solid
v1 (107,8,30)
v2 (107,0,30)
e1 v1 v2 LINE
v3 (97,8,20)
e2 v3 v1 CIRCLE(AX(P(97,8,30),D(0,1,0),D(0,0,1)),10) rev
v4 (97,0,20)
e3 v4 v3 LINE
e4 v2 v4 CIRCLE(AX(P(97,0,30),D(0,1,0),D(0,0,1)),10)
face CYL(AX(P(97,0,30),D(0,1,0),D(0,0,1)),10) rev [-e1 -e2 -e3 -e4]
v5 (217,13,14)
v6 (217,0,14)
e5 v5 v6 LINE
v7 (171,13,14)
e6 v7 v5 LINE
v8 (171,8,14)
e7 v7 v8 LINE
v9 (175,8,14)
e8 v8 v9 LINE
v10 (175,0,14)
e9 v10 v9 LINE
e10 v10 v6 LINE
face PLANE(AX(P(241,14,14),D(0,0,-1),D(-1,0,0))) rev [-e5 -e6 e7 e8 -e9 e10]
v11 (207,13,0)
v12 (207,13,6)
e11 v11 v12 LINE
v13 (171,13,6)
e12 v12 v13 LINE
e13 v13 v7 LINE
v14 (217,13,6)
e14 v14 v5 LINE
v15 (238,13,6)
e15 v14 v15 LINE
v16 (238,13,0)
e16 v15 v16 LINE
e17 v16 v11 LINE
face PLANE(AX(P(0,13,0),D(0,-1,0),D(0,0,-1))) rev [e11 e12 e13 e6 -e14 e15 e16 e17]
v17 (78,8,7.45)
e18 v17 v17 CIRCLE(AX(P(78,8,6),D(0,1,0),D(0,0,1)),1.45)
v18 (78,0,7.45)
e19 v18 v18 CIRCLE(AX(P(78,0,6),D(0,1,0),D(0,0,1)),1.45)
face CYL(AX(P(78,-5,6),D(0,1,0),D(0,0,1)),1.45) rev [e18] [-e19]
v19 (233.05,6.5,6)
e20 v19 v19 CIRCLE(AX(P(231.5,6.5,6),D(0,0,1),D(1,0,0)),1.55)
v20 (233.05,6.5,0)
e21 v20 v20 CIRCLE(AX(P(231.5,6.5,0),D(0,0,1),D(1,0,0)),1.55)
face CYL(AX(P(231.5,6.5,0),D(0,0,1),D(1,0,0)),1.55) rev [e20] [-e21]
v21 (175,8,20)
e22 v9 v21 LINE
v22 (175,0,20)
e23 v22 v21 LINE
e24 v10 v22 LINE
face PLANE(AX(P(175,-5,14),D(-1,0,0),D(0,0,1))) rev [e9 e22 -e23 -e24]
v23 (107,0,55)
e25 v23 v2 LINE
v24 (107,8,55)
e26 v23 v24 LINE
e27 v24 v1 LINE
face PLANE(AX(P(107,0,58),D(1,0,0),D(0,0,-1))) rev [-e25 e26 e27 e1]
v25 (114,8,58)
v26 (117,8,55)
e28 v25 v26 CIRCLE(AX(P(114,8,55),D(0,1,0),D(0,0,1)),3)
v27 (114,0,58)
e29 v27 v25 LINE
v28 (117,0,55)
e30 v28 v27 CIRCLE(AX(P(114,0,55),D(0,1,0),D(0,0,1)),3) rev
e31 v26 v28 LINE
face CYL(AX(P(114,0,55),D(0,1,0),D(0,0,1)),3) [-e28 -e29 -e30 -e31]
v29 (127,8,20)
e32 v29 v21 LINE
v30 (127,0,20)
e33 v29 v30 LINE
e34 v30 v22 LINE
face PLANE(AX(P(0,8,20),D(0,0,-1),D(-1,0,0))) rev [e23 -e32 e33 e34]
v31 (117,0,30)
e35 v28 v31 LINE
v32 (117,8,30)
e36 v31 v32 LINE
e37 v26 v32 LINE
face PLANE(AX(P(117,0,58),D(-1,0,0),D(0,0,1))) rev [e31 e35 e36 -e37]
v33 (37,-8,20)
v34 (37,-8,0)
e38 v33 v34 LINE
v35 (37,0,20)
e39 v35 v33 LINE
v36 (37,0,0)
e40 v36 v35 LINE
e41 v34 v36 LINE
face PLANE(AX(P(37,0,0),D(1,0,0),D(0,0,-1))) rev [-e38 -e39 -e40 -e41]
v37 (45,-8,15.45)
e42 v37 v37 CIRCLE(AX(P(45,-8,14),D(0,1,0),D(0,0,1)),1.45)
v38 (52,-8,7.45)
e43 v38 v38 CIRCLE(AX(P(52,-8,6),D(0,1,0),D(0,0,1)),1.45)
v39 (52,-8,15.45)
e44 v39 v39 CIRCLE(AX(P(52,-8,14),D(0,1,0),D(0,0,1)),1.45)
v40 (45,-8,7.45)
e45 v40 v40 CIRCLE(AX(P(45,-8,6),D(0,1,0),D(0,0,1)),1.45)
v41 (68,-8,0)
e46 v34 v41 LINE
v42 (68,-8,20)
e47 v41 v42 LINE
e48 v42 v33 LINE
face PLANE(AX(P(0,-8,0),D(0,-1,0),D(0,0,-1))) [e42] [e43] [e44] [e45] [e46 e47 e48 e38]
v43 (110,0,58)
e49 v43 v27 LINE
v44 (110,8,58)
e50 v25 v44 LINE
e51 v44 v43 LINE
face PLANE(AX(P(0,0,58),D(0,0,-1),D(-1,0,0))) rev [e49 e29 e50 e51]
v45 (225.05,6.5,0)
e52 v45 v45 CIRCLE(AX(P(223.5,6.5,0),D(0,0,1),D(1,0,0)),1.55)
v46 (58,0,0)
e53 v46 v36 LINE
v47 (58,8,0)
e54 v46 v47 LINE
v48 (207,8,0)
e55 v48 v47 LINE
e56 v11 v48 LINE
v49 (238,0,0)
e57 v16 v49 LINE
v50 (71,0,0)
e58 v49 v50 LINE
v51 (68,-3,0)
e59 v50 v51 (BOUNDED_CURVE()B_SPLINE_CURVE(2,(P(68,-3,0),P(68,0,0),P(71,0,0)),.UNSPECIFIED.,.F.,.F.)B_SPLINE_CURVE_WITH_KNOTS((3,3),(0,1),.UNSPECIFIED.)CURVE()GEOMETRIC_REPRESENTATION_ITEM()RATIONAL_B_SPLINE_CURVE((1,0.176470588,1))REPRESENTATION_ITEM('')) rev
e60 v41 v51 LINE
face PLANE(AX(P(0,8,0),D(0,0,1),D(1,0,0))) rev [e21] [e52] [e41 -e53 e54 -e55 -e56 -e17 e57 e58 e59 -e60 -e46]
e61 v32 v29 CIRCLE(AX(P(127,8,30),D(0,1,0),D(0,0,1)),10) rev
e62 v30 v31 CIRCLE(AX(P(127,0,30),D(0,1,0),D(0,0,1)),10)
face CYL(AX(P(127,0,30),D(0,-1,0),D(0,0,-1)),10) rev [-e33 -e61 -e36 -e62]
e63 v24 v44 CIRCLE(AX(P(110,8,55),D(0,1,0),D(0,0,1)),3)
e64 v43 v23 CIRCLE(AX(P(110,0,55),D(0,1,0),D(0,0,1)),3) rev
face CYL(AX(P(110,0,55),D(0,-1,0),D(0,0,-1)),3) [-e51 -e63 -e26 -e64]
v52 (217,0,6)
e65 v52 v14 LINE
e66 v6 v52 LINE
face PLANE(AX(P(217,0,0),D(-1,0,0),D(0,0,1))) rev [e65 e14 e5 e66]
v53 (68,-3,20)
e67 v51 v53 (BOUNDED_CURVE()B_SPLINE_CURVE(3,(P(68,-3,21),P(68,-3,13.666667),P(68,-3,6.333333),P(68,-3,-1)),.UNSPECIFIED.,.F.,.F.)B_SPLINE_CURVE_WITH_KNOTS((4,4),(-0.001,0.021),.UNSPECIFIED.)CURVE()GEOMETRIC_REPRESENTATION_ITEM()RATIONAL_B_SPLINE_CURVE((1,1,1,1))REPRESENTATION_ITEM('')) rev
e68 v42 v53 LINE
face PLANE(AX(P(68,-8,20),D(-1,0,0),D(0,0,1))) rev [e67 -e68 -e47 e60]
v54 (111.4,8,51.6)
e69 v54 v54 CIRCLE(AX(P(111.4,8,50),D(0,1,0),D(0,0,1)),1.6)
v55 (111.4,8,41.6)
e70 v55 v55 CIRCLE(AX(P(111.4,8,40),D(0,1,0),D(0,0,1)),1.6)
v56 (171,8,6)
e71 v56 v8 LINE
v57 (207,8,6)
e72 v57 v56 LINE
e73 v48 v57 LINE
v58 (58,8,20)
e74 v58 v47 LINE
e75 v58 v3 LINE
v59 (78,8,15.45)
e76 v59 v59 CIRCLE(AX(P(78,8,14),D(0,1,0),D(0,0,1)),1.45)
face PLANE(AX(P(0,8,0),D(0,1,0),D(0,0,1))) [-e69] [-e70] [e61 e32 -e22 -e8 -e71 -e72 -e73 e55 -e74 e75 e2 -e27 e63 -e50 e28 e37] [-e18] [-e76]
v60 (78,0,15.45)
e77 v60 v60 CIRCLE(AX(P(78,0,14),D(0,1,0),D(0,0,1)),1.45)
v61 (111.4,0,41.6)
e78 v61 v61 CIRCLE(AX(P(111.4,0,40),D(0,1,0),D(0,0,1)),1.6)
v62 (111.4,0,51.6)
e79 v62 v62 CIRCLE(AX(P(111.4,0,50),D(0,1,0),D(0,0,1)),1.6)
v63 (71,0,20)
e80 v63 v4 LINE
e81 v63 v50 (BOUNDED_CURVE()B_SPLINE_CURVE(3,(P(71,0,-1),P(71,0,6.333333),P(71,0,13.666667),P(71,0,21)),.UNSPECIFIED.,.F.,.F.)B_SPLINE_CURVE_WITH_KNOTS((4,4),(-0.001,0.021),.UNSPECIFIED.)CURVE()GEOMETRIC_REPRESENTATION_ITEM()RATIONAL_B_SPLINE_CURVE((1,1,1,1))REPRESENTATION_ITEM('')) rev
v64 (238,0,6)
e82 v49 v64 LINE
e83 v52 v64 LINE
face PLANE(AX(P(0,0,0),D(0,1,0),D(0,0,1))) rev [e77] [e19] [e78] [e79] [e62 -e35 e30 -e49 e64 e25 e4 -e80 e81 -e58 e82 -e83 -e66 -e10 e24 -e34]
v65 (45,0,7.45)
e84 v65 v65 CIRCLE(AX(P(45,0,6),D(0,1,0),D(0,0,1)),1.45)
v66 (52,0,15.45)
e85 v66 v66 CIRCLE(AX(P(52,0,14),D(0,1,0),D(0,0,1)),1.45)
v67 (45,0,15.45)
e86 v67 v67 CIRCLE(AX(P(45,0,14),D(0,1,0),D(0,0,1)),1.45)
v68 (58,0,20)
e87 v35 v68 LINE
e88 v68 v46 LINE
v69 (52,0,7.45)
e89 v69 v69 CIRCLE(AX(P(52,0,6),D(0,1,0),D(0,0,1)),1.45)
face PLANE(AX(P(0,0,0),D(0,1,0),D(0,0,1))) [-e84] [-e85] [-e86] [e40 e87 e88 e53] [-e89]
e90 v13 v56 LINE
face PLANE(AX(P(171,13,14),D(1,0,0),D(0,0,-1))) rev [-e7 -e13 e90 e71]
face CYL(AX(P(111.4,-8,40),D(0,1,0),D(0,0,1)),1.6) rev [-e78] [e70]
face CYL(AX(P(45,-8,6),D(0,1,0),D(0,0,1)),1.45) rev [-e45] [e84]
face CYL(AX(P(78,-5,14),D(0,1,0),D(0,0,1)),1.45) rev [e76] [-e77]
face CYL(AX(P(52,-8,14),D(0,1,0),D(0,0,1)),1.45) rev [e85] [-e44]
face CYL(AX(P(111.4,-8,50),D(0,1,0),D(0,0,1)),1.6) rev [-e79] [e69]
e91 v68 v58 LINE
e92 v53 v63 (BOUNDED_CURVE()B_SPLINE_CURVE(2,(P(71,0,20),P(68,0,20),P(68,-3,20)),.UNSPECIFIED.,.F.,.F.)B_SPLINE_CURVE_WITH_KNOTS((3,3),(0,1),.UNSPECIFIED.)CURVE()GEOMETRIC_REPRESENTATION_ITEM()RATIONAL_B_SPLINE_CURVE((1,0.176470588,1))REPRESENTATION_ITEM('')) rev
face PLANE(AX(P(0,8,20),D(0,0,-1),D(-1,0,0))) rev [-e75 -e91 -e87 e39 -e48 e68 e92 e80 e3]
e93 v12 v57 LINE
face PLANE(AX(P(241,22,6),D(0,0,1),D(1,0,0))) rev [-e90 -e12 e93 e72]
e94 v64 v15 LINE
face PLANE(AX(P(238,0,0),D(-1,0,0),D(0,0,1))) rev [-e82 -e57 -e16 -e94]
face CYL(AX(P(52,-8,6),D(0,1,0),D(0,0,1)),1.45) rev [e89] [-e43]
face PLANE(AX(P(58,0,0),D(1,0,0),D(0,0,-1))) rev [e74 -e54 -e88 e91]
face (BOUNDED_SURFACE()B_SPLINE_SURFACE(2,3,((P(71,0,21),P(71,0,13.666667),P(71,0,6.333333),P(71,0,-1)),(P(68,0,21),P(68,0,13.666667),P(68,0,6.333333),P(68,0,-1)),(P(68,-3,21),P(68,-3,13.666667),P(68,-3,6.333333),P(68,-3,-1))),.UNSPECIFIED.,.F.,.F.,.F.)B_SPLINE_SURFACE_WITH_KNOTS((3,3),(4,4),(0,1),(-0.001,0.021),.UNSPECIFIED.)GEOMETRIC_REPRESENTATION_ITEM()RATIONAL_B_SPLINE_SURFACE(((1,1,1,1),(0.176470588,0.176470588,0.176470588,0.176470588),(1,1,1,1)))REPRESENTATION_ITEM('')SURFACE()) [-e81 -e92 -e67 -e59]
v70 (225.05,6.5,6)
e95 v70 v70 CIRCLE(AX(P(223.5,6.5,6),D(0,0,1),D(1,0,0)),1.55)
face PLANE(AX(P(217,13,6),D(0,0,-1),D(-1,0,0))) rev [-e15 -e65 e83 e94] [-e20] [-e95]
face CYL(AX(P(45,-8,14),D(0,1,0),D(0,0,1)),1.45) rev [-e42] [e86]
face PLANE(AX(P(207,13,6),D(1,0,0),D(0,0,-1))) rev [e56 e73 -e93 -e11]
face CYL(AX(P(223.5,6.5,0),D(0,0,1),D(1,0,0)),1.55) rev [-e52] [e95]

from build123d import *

# Parameters (mm, degrees)
SKETCH1_W                 = 300
SKETCH1_H                 = 20
BOSS_EXTRUDE1_DEPTH       = 8
SKETCH2_W                 = 34
SKETCH2_H                 = 8
BOSS_EXTRUDE2_DEPTH       = 9
SKETCH3_W                 = 34
SKETCH3_H                 = 8
BOSS_EXTRUDE3_DEPTH       = 9
SKETCH4_R                 = 1.45
CUT_EXTRUDE1_DEPTH        = 302.504560496
SKETCH5_W                 = 25
SKETCH5_H                 = 8
BOSS_EXTRUDE4_DEPTH       = 17
SKETCH6_W                 = 25
SKETCH6_H                 = 8
BOSS_EXTRUDE5_DEPTH       = 17
SKETCH12_W                = 8
SKETCH12_H                = 8
BOSS_EXTRUDE7_DEPTH       = 17
BOSS_EXTRUDE8_DEPTH       = 12
SKETCH15_R                = 1.6
CUT_EXTRUDE7_DEPTH        = 20
SKETCH16_W                = 20
SKETCH16_H                = 13
BOSS_EXTRUDE9_DEPTH       = 12
SKETCH17_R                = 1.6
CUT_EXTRUDE8_DEPTH        = 20
SKETCH18_W                = 20
SKETCH18_H                = 13
BOSS_EXTRUDE10_DEPTH      = 12
CUT_EXTRUDE9_START        = -20
SKETCH19_R                = 1.6
CUT_EXTRUDE9_DEPTH        = 20
SKETCH20_W                = 20
SKETCH20_H                = 13
BOSS_EXTRUDE11_DEPTH      = 12
CUT_EXTRUDE10_START       = -20
SKETCH21_R                = 1.6
CUT_EXTRUDE10_DEPTH       = 20
SKETCH22_W                = 10
SKETCH22_H                = 38
CUT_EXTRUDE11_DEPTH       = 306.0983448
SKETCH23_W                = 8
SKETCH23_H                = 18
CUT_EXTRUDE12_DEPTH       = 4
BOSS_EXTRUDE12_DEPTH      = 10
BOSS_EXTRUDE13_DEPTH      = 8
SKETCH26_W                = 8
SKETCH26_H                = 48
BOSS_EXTRUDE14_DEPTH      = 14
SKETCH27_W                = 8
SKETCH27_H                = 16
BOSS_EXTRUDE15_DEPTH      = 14
SKETCH28_W                = 8
SKETCH28_H                = 40
CUT_EXTRUDE13_DEPTH       = 14
SKETCH30_W                = 16
SKETCH30_H                = 14
BOSS_EXTRUDE16_DEPTH      = 9
SKETCH31_W                = 17
SKETCH31_H                = 8
CUT_EXTRUDE14_DEPTH       = 5
SKETCH32_W                = 16
SKETCH32_H                = 9
CUT_EXTRUDE15_DEPTH       = 9
CUT_EXTRUDE16_DEPTH       = 10
SKETCH34_W                = 7
SKETCH34_H                = 5
CUT_EXTRUDE17_DEPTH       = 5
SKETCH35_W                = 7
SKETCH35_H                = 5
BOSS_EXTRUDE17_DEPTH      = 5
SKETCH36_R                = 1.7
CUT_EXTRUDE18_DEPTH       = 307.014705529
SKETCH37_W                = 70
SKETCH37_H                = 8
BOSS_EXTRUDE18_DEPTH      = 5
SKETCH39_W                = 66
SKETCH39_H                = 6
CUT_EXTRUDE19_DEPTH       = 306.14258962
SKETCH40_W                = 20
SKETCH40_H                = 12
BOSS_EXTRUDE19_DEPTH      = 10
BOSS_EXTRUDE20_DEPTH      = 5
BOSS_EXTRUDE20_DEPTH_BACK = 5
SKETCH41_W                = 28
SKETCH41_H                = 12
SKETCH42_R                = 1.5
CUT_EXTRUDE20_DEPTH       = 15
SKETCH43_W                = 20
SKETCH43_H                = 12
BOSS_EXTRUDE21_DEPTH      = 10
BOSS_EXTRUDE22_DEPTH      = 5
BOSS_EXTRUDE22_DEPTH_BACK = 5
SKETCH44_W                = 28
SKETCH44_H                = 12
SKETCH45_R                = 1.5
CUT_EXTRUDE21_DEPTH       = 15
SKETCH46_W                = 20
SKETCH46_H                = 12
SKETCH46_W_2              = 19.974984355
BOSS_EXTRUDE23_DEPTH      = 10
BOSS_EXTRUDE24_DEPTH      = 5
BOSS_EXTRUDE24_DEPTH_BACK = 5
SKETCH47_W                = 28
SKETCH47_H                = 12
SKETCH47_W_2              = 28.025015645
CUT_EXTRUDE22_START       = -15
SKETCH48_R                = 1.5
CUT_EXTRUDE22_DEPTH       = 15
FILLET1_R                 = 5
FILLET2_R                 = 2.5
FILLET3_R                 = 3
FILLET4_R                 = 3
SKETCH49_R                = 1.45
CUT_EXTRUDE23_DEPTH       = 309.139578763
SKETCH50_W                = 97.606758594
SKETCH50_H                = 58.271300894
CUT_EXTRUDE24_DEPTH       = 40
SKETCH51_W                = 104.080215225
SKETCH51_H                = 68.777983442
CUT_EXTRUDE25_DEPTH       = 65
SKETCH54_W                = 8
SKETCH54_H                = 13
CUT_EXTRUDE26_DEPTH       = 21
SKETCH55_W                = 31
SKETCH55_H                = 6
BOSS_EXTRUDE26_DEPTH      = 5
SKETCH56_R                = 1.55
CUT_EXTRUDE27_DEPTH       = 239.765575408
SKETCH57_W                = 31
SKETCH57_H                = 20
BOSS_EXTRUDE27_DEPTH      = 8
SKETCH58_W                = 21
SKETCH58_H                = 20
CUT_EXTRUDE28_DEPTH       = 8
SKETCH59_R                = 1.45
CUT_EXTRUDE29_DEPTH       = 240.192391183
SKETCH60_W                = 10
SKETCH60_H                = 8
BOSS_EXTRUDE28_DEPTH      = 38
SKETCH61_R                = 1.6
CUT_EXTRUDE30_DEPTH       = 246.487270546
FILLET5_R                 = 10
FILLET6_SIZE              = 3
FILLET7_R                 = 3


with BuildPart() as part:
    # Sketch1 → Boss-Extrude1 (new body)
    with BuildSketch(Plane(origin=(0, 0, 0), x_dir=(1, 0, 0), z_dir=(0, 1, 0))):
        with Locations((150, -10)):
            Rectangle(SKETCH1_W, SKETCH1_H)
    extrude(amount=BOSS_EXTRUDE1_DEPTH)

    # Sketch2 → Boss-Extrude2 (add)
    with BuildSketch(Plane.XY.offset(20)):
        with Locations((17, 4)):
            Rectangle(SKETCH2_W, SKETCH2_H)
        with Locations((283, 4)):
            Rectangle(SKETCH2_W, SKETCH2_H)
    extrude(amount=BOSS_EXTRUDE2_DEPTH)

    # Sketch3 → Boss-Extrude3 (add)
    with BuildSketch(Plane(origin=(0, 0, 0), x_dir=(-1, 0, 0), z_dir=(0, 0, -1))):
        with Locations((-17, 4)):
            Rectangle(SKETCH3_W, SKETCH3_H)
        with Locations((-283, 4)):
            Rectangle(SKETCH3_W, SKETCH3_H)
    extrude(amount=BOSS_EXTRUDE3_DEPTH)

    # Sketch4 → Cut-Extrude1 (cut, through all)
    with BuildSketch(Plane(origin=(0, 8, 0), x_dir=(1, 0, 0), z_dir=(0, 1, 0))):
        with Locations(Location((4, 5, 0), (0, 0, 270))):
            Circle(SKETCH4_R)
        with Locations(Location((30, 5, 0), (0, 0, 270))):
            Circle(SKETCH4_R)
        with Locations(Location((30, -25, 0), (0, 0, 270))):
            Circle(SKETCH4_R)
        with Locations(Location((4, -25, 0), (0, 0, 270))):
            Circle(SKETCH4_R)
        with Locations(Location((296, -25, 0), (0, 0, 270))):
            Circle(SKETCH4_R)
        with Locations(Location((296, 5, 0), (0, 0, 270))):
            Circle(SKETCH4_R)
        with Locations(Location((270, -25, 0), (0, 0, 270))):
            Circle(SKETCH4_R)
        with Locations(Location((270, 5, 0), (0, 0, 270))):
            Circle(SKETCH4_R)
    extrude(amount=-CUT_EXTRUDE1_DEPTH, mode=Mode.SUBTRACT)

    # Sketch5 → Boss-Extrude4 (add)
    with BuildSketch(Plane.XY.offset(20)):
        with Locations((253.5, 4)):
            Rectangle(SKETCH5_W, SKETCH5_H)
    extrude(amount=BOSS_EXTRUDE4_DEPTH)

    # Sketch6 → Boss-Extrude5 (add)
    with BuildSketch(Plane(origin=(0, 0, 0), x_dir=(-1, 0, 0), z_dir=(0, 0, -1))):
        with Locations((-253.5, 4)):
            Rectangle(SKETCH6_W, SKETCH6_H)
    extrude(amount=BOSS_EXTRUDE5_DEPTH)

    # Sketch12 → Boss-Extrude7 (add)
    with BuildSketch(Plane.XY.offset(37)):
        with Locations((245, 4)):
            Rectangle(SKETCH12_W, SKETCH12_H)
    extrude(amount=BOSS_EXTRUDE7_DEPTH)

    # Sketch14 → Boss-Extrude8 (add)
    with BuildSketch(Plane.XY.offset(29)):
        Polygon((294.974984355, 8), (275, 8), (275, -4), (294.974984355, -5), align=None)
    extrude(amount=BOSS_EXTRUDE8_DEPTH)

    # Sketch15 → Cut-Extrude7 (cut)
    with BuildSketch(Plane(origin=(294.974984355, 0, 0), x_dir=(0, 0, -1), z_dir=(1, 0, 0))):
        with Locations((-35, 0)):
            Circle(SKETCH15_R)
    extrude(amount=-CUT_EXTRUDE7_DEPTH, mode=Mode.SUBTRACT)

    # Sketch16 → Boss-Extrude9 (add)
    with BuildSketch(Plane(origin=(0, 0, -9), x_dir=(-1, 0, 0), z_dir=(0, 0, -1))):
        with Locations((-285, 1.5)):
            Rectangle(SKETCH16_W, SKETCH16_H)
    extrude(amount=BOSS_EXTRUDE9_DEPTH)

    # Sketch17 → Cut-Extrude8 (cut)
    with BuildSketch(Plane(origin=(295, 0, 0), x_dir=(0, 0, -1), z_dir=(1, 0, 0))):
        with Locations((15, 0)):
            Circle(SKETCH17_R)
    extrude(amount=-CUT_EXTRUDE8_DEPTH, mode=Mode.SUBTRACT)

    # Sketch18 → Boss-Extrude10 (add)
    with BuildSketch(Plane(origin=(0, 0, -9), x_dir=(-1, 0, 0), z_dir=(0, 0, -1))):
        with Locations((-15, 1.5)):
            Rectangle(SKETCH18_W, SKETCH18_H)
    extrude(amount=BOSS_EXTRUDE10_DEPTH)

    # Sketch19 → Cut-Extrude9 (cut)
    with BuildSketch(Plane.ZY.offset(-5).offset(CUT_EXTRUDE9_START)):
        with Locations(Location((-15, 0, 0), (0, 0, 180))):
            Circle(SKETCH19_R)
    extrude(amount=CUT_EXTRUDE9_DEPTH, mode=Mode.SUBTRACT)

    # Sketch20 → Boss-Extrude11 (add)
    with BuildSketch(Plane.XY.offset(29)):
        with Locations((15, 1.5)):
            Rectangle(SKETCH20_W, SKETCH20_H)
    extrude(amount=BOSS_EXTRUDE11_DEPTH)

    # Sketch21 → Cut-Extrude10 (cut)
    with BuildSketch(Plane.ZY.offset(-5).offset(CUT_EXTRUDE10_START)):
        with Locations(Location((35, 0, 0), (0, 0, 180))):
            Circle(SKETCH21_R)
    extrude(amount=CUT_EXTRUDE10_DEPTH, mode=Mode.SUBTRACT)

    # Sketch22 → Cut-Extrude11 (cut, through all)
    with BuildSketch(Plane(origin=(0, 8, 0), x_dir=(1, 0, 0), z_dir=(0, 1, 0))):
        with Locations((254, -10)):
            Rectangle(SKETCH22_W, SKETCH22_H)
    extrude(amount=-CUT_EXTRUDE11_DEPTH, mode=Mode.SUBTRACT)

    # Sketch23 → Cut-Extrude12 (cut)
    with BuildSketch(Plane(origin=(0, 0, 0), x_dir=(-1, 0, 0), z_dir=(0, -1, 0))):
        with Locations((-263, -10)):
            Rectangle(SKETCH23_W, SKETCH23_H)
    extrude(amount=-CUT_EXTRUDE12_DEPTH, mode=Mode.SUBTRACT)

    # Sketch24 → Boss-Extrude12 (add)
    with BuildSketch(Plane.ZY.offset(-259)):
        Polygon((-9, 0), (-9, 8), (-1, 8), align=None)
        Polygon((29, 0), (29, 8), (21, 8), align=None)
    extrude(amount=BOSS_EXTRUDE12_DEPTH)

    # Sketch25 → Boss-Extrude13 (add)
    with BuildSketch(Plane.ZY.offset(-267)):
        Polygon((19, 0), (19, 4), (15, 4), align=None)
        Polygon((1, 4), (5, 4), (1, 0), align=None)
    extrude(amount=BOSS_EXTRUDE13_DEPTH)

    # Sketch26 → Boss-Extrude14 (add)
    with BuildSketch(Plane(origin=(0, 8, 0), x_dir=(1, 0, 0), z_dir=(0, 1, 0))):
        with Locations((245, -30)):
            Rectangle(SKETCH26_W, SKETCH26_H)
    extrude(amount=BOSS_EXTRUDE14_DEPTH)

    # Sketch27 → Boss-Extrude15 (add)
    with BuildSketch(Plane(origin=(0, 8, 0), x_dir=(1, 0, 0), z_dir=(0, 1, 0))):
        with Locations((253, -29)):
            Rectangle(SKETCH27_W, SKETCH27_H)
    extrude(amount=BOSS_EXTRUDE15_DEPTH)

    # Sketch28 → Cut-Extrude13 (cut)
    with BuildSketch(Plane.XZ):
        with Locations((245, 34)):
            Rectangle(SKETCH28_W, SKETCH28_H)
    extrude(amount=-CUT_EXTRUDE13_DEPTH, mode=Mode.SUBTRACT)

    # Sketch30 → Boss-Extrude16 (add)
    with BuildSketch(Plane(origin=(257, 0, 0), x_dir=(0, 0, -1), z_dir=(1, 0, 0))):
        with Locations((-29, 15)):
            Rectangle(SKETCH30_W, SKETCH30_H)
    extrude(amount=BOSS_EXTRUDE16_DEPTH)

    # Sketch31 → Cut-Extrude14 (cut)
    with BuildSketch(Plane(origin=(0, 0, 0), x_dir=(-1, 0, 0), z_dir=(0, -1, 0))):
        with Locations((-257.5, -33)):
            Rectangle(SKETCH31_W, SKETCH31_H)
    extrude(amount=-CUT_EXTRUDE14_DEPTH, mode=Mode.SUBTRACT)

    # Sketch32 → Cut-Extrude15 (cut)
    with BuildSketch(Plane(origin=(266, 0, 0), x_dir=(0, 0, -1), z_dir=(1, 0, 0))):
        with Locations((-29, 17.5)):
            Rectangle(SKETCH32_W, SKETCH32_H)
    extrude(amount=-CUT_EXTRUDE15_DEPTH, mode=Mode.SUBTRACT)

    # Sketch33 → Cut-Extrude16 (cut)
    with BuildSketch(Plane.ZY.offset(-249)):
        Polygon((29, 5), (24, 5), (29, 0), align=None)
    extrude(amount=-CUT_EXTRUDE16_DEPTH, mode=Mode.SUBTRACT)

    # Sketch34 → Cut-Extrude17 (cut)
    with BuildSketch(Plane.XY.offset(29)):
        with Locations((262.5, 2.5)):
            Rectangle(SKETCH34_W, SKETCH34_H)
    extrude(amount=-CUT_EXTRUDE17_DEPTH, mode=Mode.SUBTRACT)

    # Sketch35 → Boss-Extrude17 (add)
    with BuildSketch(Plane(origin=(0, 0, 21), x_dir=(-1, 0, 0), z_dir=(0, 0, -1))):
        with Locations((-262.5, 10.5)):
            Rectangle(SKETCH35_W, SKETCH35_H)
    extrude(amount=BOSS_EXTRUDE17_DEPTH)

    # Sketch36 → Cut-Extrude18 (cut, through all)
    with BuildSketch(Plane(origin=(0, 22, 0), x_dir=(1, 0, 0), z_dir=(0, 1, 0))):
        with Locations(Location((245, -50, 0), (0, 0, 270))):
            Circle(SKETCH36_R)
        with Locations(Location((245, -18, 0), (0, 0, 270))):
            Circle(SKETCH36_R)
    extrude(amount=-CUT_EXTRUDE18_DEPTH, mode=Mode.SUBTRACT)

    # Sketch37 → Boss-Extrude18 (add)
    with BuildSketch(Plane(origin=(0, 8, 0), x_dir=(1, 0, 0), z_dir=(0, 1, 0))):
        with Locations((206, -10)):
            Rectangle(SKETCH37_W, SKETCH37_H)
    extrude(amount=BOSS_EXTRUDE18_DEPTH)

    # Sketch39 → Cut-Extrude19 (cut, through all)
    with BuildSketch(Plane(origin=(0, 8, 0), x_dir=(1, 0, 0), z_dir=(0, 1, 0))):
        with Locations((208, -17)):
            Rectangle(SKETCH39_W, SKETCH39_H)
    extrude(amount=-CUT_EXTRUDE19_DEPTH, mode=Mode.SUBTRACT)

    # Sketch40 → Boss-Extrude19 (add)
    with BuildSketch(Plane(origin=(0, 8, 0), x_dir=(1, 0, 0), z_dir=(0, 1, 0))):
        with Locations((15, 15)):
            Rectangle(SKETCH40_W, SKETCH40_H)
    extrude(amount=BOSS_EXTRUDE19_DEPTH)

    # Sketch41 → Boss-Extrude20 (add, two sides: drawn at the far end of the back side and taken through both)
    with BuildSketch(Plane(origin=(0, 18, 0), x_dir=(1, 0, 0), z_dir=(0, 1, 0)).offset(-BOSS_EXTRUDE20_DEPTH_BACK)):
        with Locations((11, 15)):
            Rectangle(SKETCH41_W, SKETCH41_H)
    extrude(amount=BOSS_EXTRUDE20_DEPTH + BOSS_EXTRUDE20_DEPTH_BACK)

    # Sketch42 → Cut-Extrude20 (cut)
    with BuildSketch(Plane.ZY.offset(3)):
        with Locations((-14, 18)):
            Circle(SKETCH42_R)
    extrude(amount=-CUT_EXTRUDE20_DEPTH, mode=Mode.SUBTRACT)

    # Sketch43 → Boss-Extrude21 (add)
    with BuildSketch(Plane(origin=(0, 8, 0), x_dir=(1, 0, 0), z_dir=(0, 1, 0))):
        with Locations((15, -35)):
            Rectangle(SKETCH43_W, SKETCH43_H)
    extrude(amount=BOSS_EXTRUDE21_DEPTH)

    # Sketch44 → Boss-Extrude22 (add, two sides: drawn at the far end of the back side and taken through both)
    with BuildSketch(Plane(origin=(0, 18, 0), x_dir=(1, 0, 0), z_dir=(0, 1, 0)).offset(-BOSS_EXTRUDE22_DEPTH_BACK)):
        with Locations((11, -35)):
            Rectangle(SKETCH44_W, SKETCH44_H)
    extrude(amount=BOSS_EXTRUDE22_DEPTH + BOSS_EXTRUDE22_DEPTH_BACK)

    # Sketch45 → Cut-Extrude21 (cut)
    with BuildSketch(Plane.ZY.offset(3)):
        with Locations((36, 18)):
            Circle(SKETCH45_R)
    extrude(amount=-CUT_EXTRUDE21_DEPTH, mode=Mode.SUBTRACT)

    # Sketch46 → Boss-Extrude23 (add)
    with BuildSketch(Plane(origin=(0, 8, 0), x_dir=(1, 0, 0), z_dir=(0, 1, 0))):
        with Locations((285, 15)):
            Rectangle(SKETCH46_W, SKETCH46_H)
        with Locations((284.987492178, -35)):
            Rectangle(SKETCH46_W_2, SKETCH46_H)
    extrude(amount=BOSS_EXTRUDE23_DEPTH)

    # Sketch47 → Boss-Extrude24 (add, two sides: drawn at the far end of the back side and taken through both)
    with BuildSketch(Plane(origin=(0, 18, 0), x_dir=(1, 0, 0), z_dir=(0, 1, 0)).offset(-BOSS_EXTRUDE24_DEPTH_BACK)):
        with Locations((289, 15)):
            Rectangle(SKETCH47_W, SKETCH47_H)
        with Locations((288.987492178, -35)):
            Rectangle(SKETCH47_W_2, SKETCH47_H)
    extrude(amount=BOSS_EXTRUDE24_DEPTH + BOSS_EXTRUDE24_DEPTH_BACK)

    # Sketch48 → Cut-Extrude22 (cut)
    with BuildSketch(Plane(origin=(303, 0, 0), x_dir=(0, 0, -1), z_dir=(1, 0, 0)).offset(CUT_EXTRUDE22_START)):
        with Locations((16, 18)):
            Circle(SKETCH48_R)
        with Locations(Location((-36, 18, 0), (0, 0, 180))):
            Circle(SKETCH48_R)
    extrude(amount=CUT_EXTRUDE22_DEPTH, mode=Mode.SUBTRACT)

    # Fillet1
    fillet1_edges = [part.edges().sort_by_distance(p)[0] for p in [
        (294.974984355, 13, 35),
        (295, 13, -15),
        (5, 13, 35),
        (5, 13, -15),
    ]]
    fillet(fillet1_edges, radius=FILLET1_R)

    # Fillet2
    # the kernel refuses this fillet: 2.5 mm, written as the material it adds along each edge
    with BuildSketch(Plane(origin=(-1.25, 8, -9), x_dir=(0, 1, 0), z_dir=(1, 0, 0))) as fillet2_piece_1_section:
        with BuildLine():
            CenterArc((FILLET2_R, FILLET2_R), FILLET2_R, 180, 90)
            Line((0, FILLET2_R), (0, 0))
            Line((0, 0), (FILLET2_R, 0))
        make_face()
    fillet2_piece_1 = extrude(amount=26.25, mode=Mode.PRIVATE)
    fillet2_piece_1 = fillet2_piece_1 - Plane(origin=(0, 8, -9), x_dir=(1, 0, 0), z_dir=(0, 0, -1)) * Cylinder(5, 63, mode=Mode.PRIVATE)
    add(fillet2_piece_1)
    with BuildSketch(Plane(origin=(25, 8, 29), x_dir=(0, 0, -1), z_dir=(-1, 0, 0))) as fillet2_piece_2_section:
        with BuildLine():
            CenterArc((FILLET2_R, -FILLET2_R), FILLET2_R, 90, 90)
            Line((0, -FILLET2_R), (0, 0))
            Line((0, 0), (FILLET2_R, 0))
        make_face()
    fillet2_piece_2 = extrude(amount=26.25, mode=Mode.PRIVATE)
    fillet2_piece_2 = fillet2_piece_2 - Plane(origin=(0, 8, 29), x_dir=(1, 0, 0), z_dir=(0, 0, 1)) * Cylinder(5, 63, mode=Mode.PRIVATE)
    add(fillet2_piece_2)
    with BuildSketch(Plane(origin=(301.25, 8, -9), x_dir=(0, 0, 1), z_dir=(-1, 0, 0))) as fillet2_piece_3_section:
        with BuildLine():
            CenterArc((FILLET2_R, FILLET2_R), FILLET2_R, 180, 90)
            Line((0, FILLET2_R), (0, 0))
            Line((0, 0), (FILLET2_R, 0))
        make_face()
    fillet2_piece_3 = extrude(amount=26.25, mode=Mode.PRIVATE)
    fillet2_piece_3 = fillet2_piece_3 - Plane(origin=(300, 8, -9), x_dir=(-1, 0, 0), z_dir=(0, 0, -1)) * Cylinder(5, 63, mode=Mode.PRIVATE)
    add(fillet2_piece_3)
    with BuildSketch(Plane(origin=(275, 8, 29), x_dir=(0, 0, -1), z_dir=(1, 0, 0))) as fillet2_piece_4_section:
        with BuildLine():
            CenterArc((FILLET2_R, FILLET2_R), FILLET2_R, 180, 90)
            Line((0, FILLET2_R), (0, 0))
            Line((0, 0), (FILLET2_R, 0))
        make_face()
    fillet2_piece_4 = extrude(amount=26.224984355, mode=Mode.PRIVATE)
    fillet2_piece_4 = fillet2_piece_4 - Plane(origin=(299.974984355, 8, 29), x_dir=(-1, 0, 0), z_dir=(0, 0, 1)) * Cylinder(5, 63, mode=Mode.PRIVATE)
    add(fillet2_piece_4)

    # Fillet3
    fillet3_edges = [part.edges().sort_by_distance(p)[0] for p in [
        (284.987492178, -4.5, 29),
        (284.987492178, -4.5, 41),
        (285, -5, -9),
        (285, -5, -21),
        (15, -5, -9),
        (15, -5, -21),
        (15, -5, 29),
        (15, -5, 41),
    ]]
    fillet(fillet3_edges, radius=FILLET3_R)

    # Fillet4
    fillet4_edges = [part.edges().sort_by_distance(p)[0] for p in [
        (11, 23, -21),
        (11, 23, -9),
        (11, 23, 41),
        (11, 23, 29),
        (289, 23, -9),
        (289, 23, -21),
        (288.987492178, 23, 41),
        (288.987492178, 23, 29),
    ]]
    fillet(fillet4_edges, radius=FILLET4_R)

    # Sketch49 → Cut-Extrude23 (cut, through all)
    with BuildSketch(Plane(origin=(0, 8, 0), x_dir=(1, 0, 0), z_dir=(0, 1, 0))):
        with Locations(Location((78, -6, 0), (0, 0, 270))):
            Circle(SKETCH49_R)
        with Locations(Location((78, -14, 0), (0, 0, 270))):
            Circle(SKETCH49_R)
    extrude(amount=-CUT_EXTRUDE23_DEPTH, mode=Mode.SUBTRACT)

    # Sketch50 → Cut-Extrude24 (cut)
    with BuildSketch(Plane.ZY.offset(3)):
        with Locations((13.990606819, 7.473892718)):
            Rectangle(SKETCH50_W, SKETCH50_H)
    extrude(amount=-CUT_EXTRUDE24_DEPTH, mode=Mode.SUBTRACT)

    # Sketch51 → Cut-Extrude25 (cut)
    with BuildSketch(Plane(origin=(303, 0, 0), x_dir=(0, 0, -1), z_dir=(1, 0, 0))):
        with Locations((-18.453232298, 2.421236934)):
            Rectangle(SKETCH51_W, SKETCH51_H)
    extrude(amount=-CUT_EXTRUDE25_DEPTH, mode=Mode.SUBTRACT)

    # Sketch54 → Cut-Extrude26 (cut)
    with BuildSketch(Plane(origin=(238, 0, 0), x_dir=(0, 0, -1), z_dir=(1, 0, 0))):
        with Locations((-10, 6.5)):
            Rectangle(SKETCH54_W, SKETCH54_H)
    extrude(amount=-CUT_EXTRUDE26_DEPTH, mode=Mode.SUBTRACT)

    # Sketch55 → Boss-Extrude26 (add)
    with BuildSketch(Plane(origin=(0, 8, 0), x_dir=(1, 0, 0), z_dir=(0, 1, 0))):
        with Locations((222.5, -3)):
            Rectangle(SKETCH55_W, SKETCH55_H)
    extrude(amount=BOSS_EXTRUDE26_DEPTH)

    # Sketch56 → Cut-Extrude27 (cut, through all)
    with BuildSketch(Plane.XY.offset(6)):
        with Locations((231.5, 6.5)):
            Circle(SKETCH56_R)
        with Locations((223.5, 6.5)):
            Circle(SKETCH56_R)
    extrude(amount=-CUT_EXTRUDE27_DEPTH, mode=Mode.SUBTRACT)

    # Sketch57 → Boss-Extrude27 (add)
    with BuildSketch(Plane(origin=(0, 0, 0), x_dir=(-1, 0, 0), z_dir=(0, -1, 0))):
        with Locations((-52.5, -10)):
            Rectangle(SKETCH57_W, SKETCH57_H)
    extrude(amount=BOSS_EXTRUDE27_DEPTH)

    # Sketch58 → Cut-Extrude28 (cut)
    with BuildSketch(Plane(origin=(0, 8, 0), x_dir=(1, 0, 0), z_dir=(0, 1, 0))):
        with Locations((47.5, -10)):
            Rectangle(SKETCH58_W, SKETCH58_H)
    extrude(amount=-CUT_EXTRUDE28_DEPTH, mode=Mode.SUBTRACT)

    # Sketch59 → Cut-Extrude29 (cut, through all)
    with BuildSketch(Plane(origin=(0, 0, 0), x_dir=(1, 0, 0), z_dir=(0, 1, 0))):
        with Locations(Location((52, -6, 0), (0, 0, 270))):
            Circle(SKETCH59_R)
        with Locations(Location((45, -6, 0), (0, 0, 270))):
            Circle(SKETCH59_R)
        with Locations(Location((45, -14, 0), (0, 0, 270))):
            Circle(SKETCH59_R)
        with Locations(Location((52, -14, 0), (0, 0, 270))):
            Circle(SKETCH59_R)
    extrude(amount=-CUT_EXTRUDE29_DEPTH, mode=Mode.SUBTRACT)

    # Sketch60 → Boss-Extrude28 (add)
    with BuildSketch(Plane.XY.offset(20)):
        with Locations((112, 4)):
            Rectangle(SKETCH60_W, SKETCH60_H)
    extrude(amount=BOSS_EXTRUDE28_DEPTH)

    # Sketch61 → Cut-Extrude30 (cut, through all)
    with BuildSketch(Plane(origin=(0, 8, 0), x_dir=(1, 0, 0), z_dir=(0, 1, 0))):
        with Locations(Location((111.4, -50, 0), (0, 0, 270))):
            Circle(SKETCH61_R)
        with Locations(Location((111.4, -40, 0), (0, 0, 270))):
            Circle(SKETCH61_R)
    extrude(amount=-CUT_EXTRUDE30_DEPTH, mode=Mode.SUBTRACT)

    # Fillet5
    fillet5_edges = [part.edges().sort_by_distance(p)[0] for p in [
        (107, 4, 20),
        (117, 4, 20),
    ]]
    fillet(fillet5_edges, radius=FILLET5_R)

    # Fillet6
    # a fillet whose section is not a circle: 3 mm, written as the material it adds along each edge
    with BuildSketch(Plane(origin=(68, 0, 20), x_dir=(1, 0, 0), z_dir=(0, 0, -1))) as fillet6_piece_1:
        with BuildLine():
            Bezier((FILLET6_SIZE, 0), (0, 0), (0, FILLET6_SIZE), weights=[1, 0.176470588, 1])
            Line((0, FILLET6_SIZE), (0, 0))
            Line((0, 0), (FILLET6_SIZE, 0))
        make_face()
    extrude(amount=20)

    # Fillet7
    fillet7_edges = [part.edges().sort_by_distance(p)[0] for p in [
        (107, 4, 58),
        (117, 4, 58),
    ]]
    fillet(fillet7_edges, radius=FILLET7_R)


solid = part.part
